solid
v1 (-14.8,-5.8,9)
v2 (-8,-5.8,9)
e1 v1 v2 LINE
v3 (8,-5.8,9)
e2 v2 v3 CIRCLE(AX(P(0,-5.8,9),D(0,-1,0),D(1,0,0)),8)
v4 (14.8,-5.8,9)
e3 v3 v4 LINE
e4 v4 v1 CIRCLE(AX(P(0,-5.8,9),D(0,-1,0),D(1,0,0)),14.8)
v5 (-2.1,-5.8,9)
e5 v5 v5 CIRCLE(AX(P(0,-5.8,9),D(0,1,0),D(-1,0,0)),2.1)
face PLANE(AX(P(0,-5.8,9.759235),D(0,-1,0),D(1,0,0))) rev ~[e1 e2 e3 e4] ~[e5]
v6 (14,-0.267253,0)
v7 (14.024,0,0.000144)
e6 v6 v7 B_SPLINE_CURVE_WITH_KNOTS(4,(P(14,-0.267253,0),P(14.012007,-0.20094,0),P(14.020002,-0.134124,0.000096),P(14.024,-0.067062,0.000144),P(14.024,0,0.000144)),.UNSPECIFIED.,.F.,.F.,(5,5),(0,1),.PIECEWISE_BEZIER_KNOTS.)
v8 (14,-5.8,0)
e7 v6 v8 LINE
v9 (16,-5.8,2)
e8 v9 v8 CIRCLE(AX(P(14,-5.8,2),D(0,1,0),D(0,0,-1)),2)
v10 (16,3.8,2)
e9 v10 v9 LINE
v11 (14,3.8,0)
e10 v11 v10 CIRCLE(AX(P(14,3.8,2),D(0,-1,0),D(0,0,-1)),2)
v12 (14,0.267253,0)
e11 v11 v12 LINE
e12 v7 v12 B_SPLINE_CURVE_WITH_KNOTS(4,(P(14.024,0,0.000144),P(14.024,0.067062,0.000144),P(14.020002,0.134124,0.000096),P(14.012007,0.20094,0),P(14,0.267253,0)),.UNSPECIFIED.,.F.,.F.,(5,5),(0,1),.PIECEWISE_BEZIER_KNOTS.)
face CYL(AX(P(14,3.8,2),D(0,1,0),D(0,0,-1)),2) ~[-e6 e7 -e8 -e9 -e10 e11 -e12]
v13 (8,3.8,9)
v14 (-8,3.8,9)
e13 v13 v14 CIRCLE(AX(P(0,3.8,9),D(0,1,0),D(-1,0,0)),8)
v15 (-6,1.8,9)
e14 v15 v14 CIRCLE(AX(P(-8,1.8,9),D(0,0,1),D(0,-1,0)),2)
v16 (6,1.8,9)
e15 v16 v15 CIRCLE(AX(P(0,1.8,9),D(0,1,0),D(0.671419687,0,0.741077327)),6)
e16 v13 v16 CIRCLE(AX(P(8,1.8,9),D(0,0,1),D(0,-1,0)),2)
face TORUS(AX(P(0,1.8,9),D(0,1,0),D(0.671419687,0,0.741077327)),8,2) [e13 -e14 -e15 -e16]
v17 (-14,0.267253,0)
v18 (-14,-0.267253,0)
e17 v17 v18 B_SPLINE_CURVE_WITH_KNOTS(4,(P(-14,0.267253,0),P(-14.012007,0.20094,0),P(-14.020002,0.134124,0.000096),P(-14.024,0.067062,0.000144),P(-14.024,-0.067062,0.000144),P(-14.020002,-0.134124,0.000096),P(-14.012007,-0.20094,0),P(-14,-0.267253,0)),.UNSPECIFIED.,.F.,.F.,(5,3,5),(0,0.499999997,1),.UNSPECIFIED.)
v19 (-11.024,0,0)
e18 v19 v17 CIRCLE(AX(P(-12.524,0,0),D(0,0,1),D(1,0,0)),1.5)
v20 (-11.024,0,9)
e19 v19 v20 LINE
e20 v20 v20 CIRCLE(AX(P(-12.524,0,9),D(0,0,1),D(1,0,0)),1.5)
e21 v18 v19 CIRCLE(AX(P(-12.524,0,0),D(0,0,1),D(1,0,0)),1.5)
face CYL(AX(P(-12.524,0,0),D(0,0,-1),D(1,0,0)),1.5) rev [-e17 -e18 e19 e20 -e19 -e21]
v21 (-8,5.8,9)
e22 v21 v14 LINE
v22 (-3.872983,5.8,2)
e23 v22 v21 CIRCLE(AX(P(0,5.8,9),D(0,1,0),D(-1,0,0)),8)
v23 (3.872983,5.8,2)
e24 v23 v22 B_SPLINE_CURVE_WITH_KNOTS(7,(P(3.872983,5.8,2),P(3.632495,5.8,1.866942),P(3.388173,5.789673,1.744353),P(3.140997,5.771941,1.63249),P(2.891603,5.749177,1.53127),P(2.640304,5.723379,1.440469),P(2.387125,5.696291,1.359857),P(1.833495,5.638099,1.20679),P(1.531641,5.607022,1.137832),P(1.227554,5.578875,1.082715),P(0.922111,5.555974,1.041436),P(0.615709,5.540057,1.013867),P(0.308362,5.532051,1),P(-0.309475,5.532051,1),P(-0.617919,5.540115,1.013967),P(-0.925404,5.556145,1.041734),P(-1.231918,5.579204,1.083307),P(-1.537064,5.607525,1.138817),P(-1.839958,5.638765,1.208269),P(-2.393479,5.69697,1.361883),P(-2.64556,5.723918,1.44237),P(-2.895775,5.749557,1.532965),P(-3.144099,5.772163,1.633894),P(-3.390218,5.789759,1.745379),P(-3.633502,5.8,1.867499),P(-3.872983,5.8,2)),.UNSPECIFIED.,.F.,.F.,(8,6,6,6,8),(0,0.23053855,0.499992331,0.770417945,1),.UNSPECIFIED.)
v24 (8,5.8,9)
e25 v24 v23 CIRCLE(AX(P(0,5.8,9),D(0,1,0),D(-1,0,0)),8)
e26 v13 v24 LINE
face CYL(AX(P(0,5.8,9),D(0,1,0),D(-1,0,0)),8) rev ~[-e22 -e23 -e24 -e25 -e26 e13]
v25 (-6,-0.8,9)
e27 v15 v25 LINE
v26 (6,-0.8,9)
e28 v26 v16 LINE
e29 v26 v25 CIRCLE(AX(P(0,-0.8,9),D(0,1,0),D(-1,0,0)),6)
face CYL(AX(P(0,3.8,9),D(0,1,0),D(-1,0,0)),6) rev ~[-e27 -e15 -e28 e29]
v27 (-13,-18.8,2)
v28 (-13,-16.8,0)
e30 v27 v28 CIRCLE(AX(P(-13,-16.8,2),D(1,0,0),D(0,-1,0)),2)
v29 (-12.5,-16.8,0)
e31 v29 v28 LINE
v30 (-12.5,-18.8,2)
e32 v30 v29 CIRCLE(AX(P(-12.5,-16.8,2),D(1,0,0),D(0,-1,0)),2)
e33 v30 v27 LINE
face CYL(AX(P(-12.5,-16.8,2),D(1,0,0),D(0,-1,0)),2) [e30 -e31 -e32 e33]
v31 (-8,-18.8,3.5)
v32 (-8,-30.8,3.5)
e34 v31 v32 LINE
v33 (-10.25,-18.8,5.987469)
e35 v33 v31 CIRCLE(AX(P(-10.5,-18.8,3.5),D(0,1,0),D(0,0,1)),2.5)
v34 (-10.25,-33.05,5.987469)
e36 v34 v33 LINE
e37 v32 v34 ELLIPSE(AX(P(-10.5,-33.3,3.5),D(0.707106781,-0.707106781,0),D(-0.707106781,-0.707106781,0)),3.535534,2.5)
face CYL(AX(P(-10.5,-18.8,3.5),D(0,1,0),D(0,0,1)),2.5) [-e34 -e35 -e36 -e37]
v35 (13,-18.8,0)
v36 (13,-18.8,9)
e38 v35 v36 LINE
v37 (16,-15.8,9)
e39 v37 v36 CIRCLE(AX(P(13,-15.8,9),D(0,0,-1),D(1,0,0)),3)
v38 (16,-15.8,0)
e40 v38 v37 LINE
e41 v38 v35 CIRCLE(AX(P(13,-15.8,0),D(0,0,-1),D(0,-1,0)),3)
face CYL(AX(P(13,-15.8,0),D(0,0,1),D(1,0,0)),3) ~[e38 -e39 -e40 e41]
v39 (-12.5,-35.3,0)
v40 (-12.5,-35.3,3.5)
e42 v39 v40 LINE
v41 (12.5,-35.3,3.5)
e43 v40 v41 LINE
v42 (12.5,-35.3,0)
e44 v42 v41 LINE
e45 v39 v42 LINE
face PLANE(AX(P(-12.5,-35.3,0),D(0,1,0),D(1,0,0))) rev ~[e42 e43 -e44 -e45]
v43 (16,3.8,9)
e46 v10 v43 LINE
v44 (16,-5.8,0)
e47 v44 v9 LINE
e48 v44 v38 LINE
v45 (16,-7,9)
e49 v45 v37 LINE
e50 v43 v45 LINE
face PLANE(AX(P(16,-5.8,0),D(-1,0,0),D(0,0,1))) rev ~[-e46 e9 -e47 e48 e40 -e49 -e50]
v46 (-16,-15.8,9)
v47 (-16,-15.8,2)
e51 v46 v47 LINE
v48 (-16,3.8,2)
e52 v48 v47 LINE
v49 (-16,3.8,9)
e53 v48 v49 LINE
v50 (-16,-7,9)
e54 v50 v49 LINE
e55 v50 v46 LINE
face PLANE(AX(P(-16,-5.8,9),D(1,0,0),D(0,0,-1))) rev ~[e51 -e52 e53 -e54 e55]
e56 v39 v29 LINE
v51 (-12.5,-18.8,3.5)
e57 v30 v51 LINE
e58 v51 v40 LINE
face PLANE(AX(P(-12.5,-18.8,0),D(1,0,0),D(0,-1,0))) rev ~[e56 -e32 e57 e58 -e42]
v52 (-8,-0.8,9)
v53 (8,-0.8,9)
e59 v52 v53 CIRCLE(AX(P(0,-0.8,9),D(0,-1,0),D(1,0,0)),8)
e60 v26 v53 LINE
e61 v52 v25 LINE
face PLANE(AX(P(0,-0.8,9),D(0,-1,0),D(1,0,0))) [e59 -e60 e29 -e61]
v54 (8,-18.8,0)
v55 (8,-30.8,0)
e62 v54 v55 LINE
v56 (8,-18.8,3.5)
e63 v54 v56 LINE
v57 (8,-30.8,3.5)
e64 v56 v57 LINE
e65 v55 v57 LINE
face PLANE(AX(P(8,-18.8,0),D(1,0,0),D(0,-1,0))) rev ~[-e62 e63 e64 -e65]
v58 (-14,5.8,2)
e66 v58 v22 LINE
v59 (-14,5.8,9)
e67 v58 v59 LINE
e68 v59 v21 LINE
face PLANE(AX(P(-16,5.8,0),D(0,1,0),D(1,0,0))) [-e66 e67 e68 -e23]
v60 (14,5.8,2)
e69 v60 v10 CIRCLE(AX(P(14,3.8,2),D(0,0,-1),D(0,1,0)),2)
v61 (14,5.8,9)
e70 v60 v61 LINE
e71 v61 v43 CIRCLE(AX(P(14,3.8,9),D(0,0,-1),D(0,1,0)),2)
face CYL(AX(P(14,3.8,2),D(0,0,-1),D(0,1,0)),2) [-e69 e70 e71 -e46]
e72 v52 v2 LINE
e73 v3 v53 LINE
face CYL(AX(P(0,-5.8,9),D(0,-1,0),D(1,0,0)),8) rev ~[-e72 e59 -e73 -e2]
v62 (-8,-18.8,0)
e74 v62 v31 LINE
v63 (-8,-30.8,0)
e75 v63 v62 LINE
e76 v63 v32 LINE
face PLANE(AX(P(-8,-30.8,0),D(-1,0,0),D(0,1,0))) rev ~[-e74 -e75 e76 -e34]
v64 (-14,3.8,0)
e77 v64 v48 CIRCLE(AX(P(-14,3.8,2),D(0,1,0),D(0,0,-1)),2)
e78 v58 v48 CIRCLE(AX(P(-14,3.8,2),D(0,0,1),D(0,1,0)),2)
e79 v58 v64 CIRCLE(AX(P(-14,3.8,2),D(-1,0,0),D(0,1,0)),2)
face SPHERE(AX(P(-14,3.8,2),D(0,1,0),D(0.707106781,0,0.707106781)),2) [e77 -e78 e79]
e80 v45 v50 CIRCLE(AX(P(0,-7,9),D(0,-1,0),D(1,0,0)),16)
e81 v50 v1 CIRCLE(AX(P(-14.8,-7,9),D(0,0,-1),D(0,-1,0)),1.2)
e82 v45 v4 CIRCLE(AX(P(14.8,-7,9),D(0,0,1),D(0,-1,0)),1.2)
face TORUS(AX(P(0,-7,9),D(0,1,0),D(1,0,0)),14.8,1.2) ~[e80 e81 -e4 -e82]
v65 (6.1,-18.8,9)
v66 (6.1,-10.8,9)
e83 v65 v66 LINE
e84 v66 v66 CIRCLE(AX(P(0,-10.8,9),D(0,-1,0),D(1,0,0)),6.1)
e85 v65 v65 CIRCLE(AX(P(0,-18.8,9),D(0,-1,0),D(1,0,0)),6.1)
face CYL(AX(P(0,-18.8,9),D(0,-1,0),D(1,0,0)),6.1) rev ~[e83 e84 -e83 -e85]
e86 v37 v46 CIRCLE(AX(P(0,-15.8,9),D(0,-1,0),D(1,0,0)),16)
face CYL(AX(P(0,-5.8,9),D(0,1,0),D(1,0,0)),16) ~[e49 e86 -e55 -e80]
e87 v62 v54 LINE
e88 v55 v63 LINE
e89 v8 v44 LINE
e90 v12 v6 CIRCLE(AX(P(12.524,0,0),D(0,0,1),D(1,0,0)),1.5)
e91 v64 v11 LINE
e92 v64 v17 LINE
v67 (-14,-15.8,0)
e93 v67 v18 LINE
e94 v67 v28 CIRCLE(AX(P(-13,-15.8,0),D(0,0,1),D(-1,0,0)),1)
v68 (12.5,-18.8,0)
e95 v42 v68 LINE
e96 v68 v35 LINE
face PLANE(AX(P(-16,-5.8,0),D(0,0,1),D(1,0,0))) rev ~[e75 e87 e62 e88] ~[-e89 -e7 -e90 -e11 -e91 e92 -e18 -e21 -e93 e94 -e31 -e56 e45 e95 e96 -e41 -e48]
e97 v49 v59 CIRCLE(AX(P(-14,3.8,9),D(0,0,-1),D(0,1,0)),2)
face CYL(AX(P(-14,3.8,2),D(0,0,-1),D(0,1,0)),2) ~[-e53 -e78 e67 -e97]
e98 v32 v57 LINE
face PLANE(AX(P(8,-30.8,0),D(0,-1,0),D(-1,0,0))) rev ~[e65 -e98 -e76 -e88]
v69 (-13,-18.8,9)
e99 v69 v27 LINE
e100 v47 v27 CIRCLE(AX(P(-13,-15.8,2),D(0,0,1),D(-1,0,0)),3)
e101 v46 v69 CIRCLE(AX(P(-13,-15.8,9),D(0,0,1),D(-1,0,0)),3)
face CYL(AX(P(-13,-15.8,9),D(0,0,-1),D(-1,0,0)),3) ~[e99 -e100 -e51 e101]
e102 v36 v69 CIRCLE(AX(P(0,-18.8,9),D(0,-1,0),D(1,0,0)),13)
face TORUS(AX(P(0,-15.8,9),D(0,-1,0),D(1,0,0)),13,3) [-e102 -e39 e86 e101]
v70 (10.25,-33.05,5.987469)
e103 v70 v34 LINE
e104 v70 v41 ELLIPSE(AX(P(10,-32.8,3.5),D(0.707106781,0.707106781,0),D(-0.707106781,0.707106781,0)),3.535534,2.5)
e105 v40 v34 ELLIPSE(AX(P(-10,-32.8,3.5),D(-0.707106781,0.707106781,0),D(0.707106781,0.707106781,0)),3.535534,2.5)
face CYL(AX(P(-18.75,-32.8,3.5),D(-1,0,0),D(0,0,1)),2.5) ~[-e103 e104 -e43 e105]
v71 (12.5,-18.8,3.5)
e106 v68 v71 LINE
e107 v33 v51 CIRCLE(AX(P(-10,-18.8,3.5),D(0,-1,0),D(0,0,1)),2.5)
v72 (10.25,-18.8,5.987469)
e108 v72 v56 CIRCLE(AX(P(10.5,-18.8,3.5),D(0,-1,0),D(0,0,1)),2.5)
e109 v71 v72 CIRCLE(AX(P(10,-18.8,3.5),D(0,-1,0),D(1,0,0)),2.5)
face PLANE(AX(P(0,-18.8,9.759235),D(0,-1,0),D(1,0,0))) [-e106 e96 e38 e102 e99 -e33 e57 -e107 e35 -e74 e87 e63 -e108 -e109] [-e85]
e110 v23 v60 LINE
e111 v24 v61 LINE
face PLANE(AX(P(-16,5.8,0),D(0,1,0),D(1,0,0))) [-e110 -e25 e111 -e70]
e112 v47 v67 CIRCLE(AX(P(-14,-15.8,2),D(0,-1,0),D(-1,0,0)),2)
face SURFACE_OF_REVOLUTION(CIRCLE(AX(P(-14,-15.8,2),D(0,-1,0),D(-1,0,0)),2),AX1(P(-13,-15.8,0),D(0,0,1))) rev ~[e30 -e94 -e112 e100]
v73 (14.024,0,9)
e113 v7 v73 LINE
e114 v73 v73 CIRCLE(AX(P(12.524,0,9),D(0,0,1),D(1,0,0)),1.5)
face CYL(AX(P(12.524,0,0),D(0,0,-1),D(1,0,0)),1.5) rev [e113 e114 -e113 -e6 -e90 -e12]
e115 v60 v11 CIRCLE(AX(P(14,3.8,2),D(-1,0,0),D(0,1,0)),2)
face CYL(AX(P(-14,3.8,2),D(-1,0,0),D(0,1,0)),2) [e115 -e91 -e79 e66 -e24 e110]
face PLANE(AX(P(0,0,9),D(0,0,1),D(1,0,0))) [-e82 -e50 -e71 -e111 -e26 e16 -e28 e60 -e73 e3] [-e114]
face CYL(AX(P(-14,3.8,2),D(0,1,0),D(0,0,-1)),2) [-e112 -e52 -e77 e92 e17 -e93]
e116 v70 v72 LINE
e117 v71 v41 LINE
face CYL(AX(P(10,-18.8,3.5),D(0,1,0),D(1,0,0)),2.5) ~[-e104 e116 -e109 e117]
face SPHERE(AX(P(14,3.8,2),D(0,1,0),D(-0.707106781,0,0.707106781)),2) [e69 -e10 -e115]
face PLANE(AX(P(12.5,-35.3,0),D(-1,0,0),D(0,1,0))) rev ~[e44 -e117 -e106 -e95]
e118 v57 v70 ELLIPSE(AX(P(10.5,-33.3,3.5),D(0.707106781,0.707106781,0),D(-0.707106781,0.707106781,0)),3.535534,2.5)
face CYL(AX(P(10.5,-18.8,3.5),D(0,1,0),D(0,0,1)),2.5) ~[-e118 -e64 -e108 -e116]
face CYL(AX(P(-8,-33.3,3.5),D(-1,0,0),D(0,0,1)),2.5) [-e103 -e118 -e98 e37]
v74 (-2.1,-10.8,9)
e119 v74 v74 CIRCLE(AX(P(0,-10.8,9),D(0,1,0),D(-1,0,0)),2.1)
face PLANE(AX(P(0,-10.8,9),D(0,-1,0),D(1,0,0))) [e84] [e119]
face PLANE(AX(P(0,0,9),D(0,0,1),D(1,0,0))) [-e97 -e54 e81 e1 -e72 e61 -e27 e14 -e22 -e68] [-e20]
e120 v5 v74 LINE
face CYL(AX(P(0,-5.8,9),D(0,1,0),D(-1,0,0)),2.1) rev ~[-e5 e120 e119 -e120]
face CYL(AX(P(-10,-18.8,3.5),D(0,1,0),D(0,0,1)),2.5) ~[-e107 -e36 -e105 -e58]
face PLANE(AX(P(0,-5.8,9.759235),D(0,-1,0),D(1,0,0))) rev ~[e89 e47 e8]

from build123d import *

# Parameters (mm, degrees)
F0_W          = 32
F0_H          = 11.6
F0_R          = 1.5
F1_DEPTH      = 9
F2_R          = 8
F1_FACE1_W    = 32
F1_FACE1_H    = 9
F3_DEPTH      = 5
F4_R          = 8
F5_DEPTH      = 2
F6_R          = 6
F7_DEPTH      = 25
F8_T1_DEPTH   = 28
F8_T3_DEPTH   = 12
F8_T5_DEPTH   = 14.6
F8_S9_W       = 2
F8_S9_H       = 2
F8_T10_DEPTH  = 2
F8_S15_W      = 2
F8_S15_H      = 2
F8_T16_DEPTH  = 2
F8_T20_ANGLE  = 275.6465366004
F10_DEPTH     = 13
F12_DEPTH     = 6
F13_T1_DEPTH  = 12
F13_T3_DEPTH  = 22.75
F13_T5_DEPTH  = 16
F13_T7_DEPTH  = 37.5
F13_T13_DEPTH = 18.25
F13_T17_DEPTH = 22.25
F13_T24_DEPTH = 18.25
F13_T28_DEPTH = 22.25
F14_R         = 3
F15_R         = 1.2
F16_R         = 6.1
F17_DEPTH     = 8
F18_T3_ANGLE  = 90
F18_T6_DEPTH  = 15
F18_T9_DEPTH  = 0.5
F19_R         = 2.1
F20_DEPTH     = 7


# Not quite as in the source:
# - a fillet or chamfer that OpenCascade refuses, or shapes differently, is made with other operations: its cross-section is extruded or revolved along the edge and cut away or added


with BuildPart() as f1:
    # F0 (on Top) → F1 (new body)
    with BuildSketch(Plane.XY):
        Rectangle(F0_W, F0_H)
        with Locations((-12.524, 0)):
            Circle(F0_R, mode=Mode.SUBTRACT)
        with Locations((12.524, 0)):
            Circle(F0_R, mode=Mode.SUBTRACT)
    extrude(amount=F1_DEPTH)

    # F2 (on face) + F1_face1 (on face) → F3 (cut)
    with BuildSketch(Plane.XZ.offset(5.8)):
        with Locations((0, 9)):
            Circle(F2_R)
    with BuildSketch(Plane(origin=(0, 5.8, 4.5), x_dir=(-1, 0, 0), z_dir=(0, 1, 0))):
        Rectangle(F1_FACE1_W, F1_FACE1_H)
    extrude(amount=-F3_DEPTH, dir=(0, -1, 0), mode=Mode.SUBTRACT)

    # F4 (on face) → F5 (cut)
    with BuildSketch(Plane(origin=(0, 5.8, 0), x_dir=(-1, 0, 0), z_dir=(0, 1, 0))):
        with Locations((0, 9)):
            Circle(F4_R)
    extrude(amount=-F5_DEPTH, mode=Mode.SUBTRACT)

    # F6 (on face) → F7 (cut)
    with BuildSketch(Plane(origin=(0, 3.8, 0), x_dir=(-1, 0, 0), z_dir=(0, 1, 0))):
        with Locations((0, 9)):
            Circle(F6_R)
    extrude(amount=-F7_DEPTH, mode=Mode.SUBTRACT)

    # F8: fillet of radius 2 on 6 edges, made by hand

    # F8_s2 → F8_t1 (cut)
    with BuildSketch(Plane.YZ.offset(-14)):
        with BuildLine():
            ThreePointArc((5.8, 2), (5.2142135624, 0.5857864376), (3.8, 0))
            Line((3.8, 0), (5.8, 0))
            Line((5.8, 0), (5.8, 2))
        make_face()
    extrude(amount=F8_T1_DEPTH, mode=Mode.SUBTRACT)

    # F8_s4 → F8_t3 (cut)
    with BuildSketch(Plane.XY.offset(2)):
        with BuildLine():
            ThreePointArc((-14, 5.8), (-15.4142135624, 5.2142135624), (-16, 3.8))
            Line((-16, 3.8), (-16, 5.8))
            Line((-16, 5.8), (-14, 5.8))
        make_face()
        with BuildLine():
            ThreePointArc((14, 5.8), (15.4142135624, 5.2142135624), (16, 3.8))
            Line((16, 3.8), (16, 5.8))
            Line((16, 5.8), (14, 5.8))
        make_face()
    extrude(amount=F8_T3_DEPTH, mode=Mode.SUBTRACT)

    # F8_s6 → F8_t5 (cut)
    with BuildSketch(Plane.XZ.offset(-3.8)):
        with BuildLine():
            ThreePointArc((-14, 0), (-15.4142135624, 0.5857864376), (-16, 2))
            Line((-16, 2), (-16, 0))
            Line((-16, 0), (-14, 0))
        make_face()
        with BuildLine():
            ThreePointArc((14, 0), (15.4142135624, 0.5857864376), (16, 2))
            Line((16, 2), (16, 0))
            Line((16, 0), (14, 0))
        make_face()
    extrude(amount=F8_T5_DEPTH, mode=Mode.SUBTRACT)


with BuildPart() as f8_tool8:
    # F8_s9 → F8_t10 (new body)
    with BuildSketch(Plane.XZ.offset(-3.8)):
        with Locations((15, 1)):
            Rectangle(F8_S9_W, F8_S9_H)
    extrude(amount=-F8_T10_DEPTH)

    # F8_s11 → F8_t12 (revolve, cut)
    with BuildSketch(Plane(origin=(14, 3.8, 2), x_dir=(-0.7071067812, 0, 0.7071067812), z_dir=(-0.7071067812, 0, -0.7071067812))):
        with BuildLine():
            ThreePointArc((0, -2), (2, 0), (0, 2))
            Line((0, 2), (0, -2))
        make_face()
    revolve(axis=Axis((14, 3.8, 2), (0, 1, 0)), mode=Mode.SUBTRACT)


with BuildPart() as f1_1:
    add(f1.part)

    # F8_t7: cut F8_tool8
    add(f8_tool8.part, mode=Mode.SUBTRACT)


with BuildPart() as f8_tool14:
    # F8_s15 → F8_t16 (new body)
    with BuildSketch(Plane.XZ.offset(-3.8)):
        with Locations((-15, 1)):
            Rectangle(F8_S15_W, F8_S15_H)
    extrude(amount=-F8_T16_DEPTH)

    # F8_s17 → F8_t18 (revolve, cut)
    with BuildSketch(Plane(origin=(-14, 3.8, 2), x_dir=(0.7071067812, 0, 0.7071067812), z_dir=(-0.7071067812, 0, 0.7071067812))):
        with BuildLine():
            ThreePointArc((0, -2), (2, 0), (0, 2))
            Line((0, 2), (0, -2))
        make_face()
    revolve(axis=Axis((-14, 3.8, 2), (0, 1, 0)), mode=Mode.SUBTRACT)


with BuildPart() as f1_2:
    add(f1_1.part)

    # F8_t13: cut F8_tool14
    add(f8_tool14.part, mode=Mode.SUBTRACT)

    # F8_s19 → F8_t20 (revolve, cut)
    with BuildSketch(Plane(origin=(-4.4781651596, 0, 4.057239564), x_dir=(0, 1, 0), z_dir=(-0.7410773266, 0, 0.6714196869))):
        with BuildLine():
            ThreePointArc((3.8, -14.6696959394), (3.2142135624, -13.255482377), (1.8, -12.6696959394))
            Line((1.8, -12.6696959394), (3.8, -12.6696959394))
            Line((3.8, -12.6696959394), (3.8, -14.6696959394))
        make_face()
    revolve(axis=Axis((0, 3.8, 9), (0, 1, 0)), revolution_arc=F8_T20_ANGLE, mode=Mode.SUBTRACT)

    # F9 (on face) → F10 (join)
    with BuildSketch(Plane.XZ.offset(5.8)):
        with BuildLine():
            Line((16, 0), (16, 9))
            ThreePointArc((16, 9), (0, 25), (-16, 9))
            Line((-16, 9), (-16, 0))
            Line((-16, 0), (-13.2287565553, 0))
            Line((-13.2287565553, 0), (0, 0))
            Line((0, 0), (13.2287565553, 0))
            Line((13.2287565553, 0), (16, 0))
        make_face()
    extrude(amount=F10_DEPTH)

    # F11 (on Top) → F12 (join)
    with BuildSketch(Plane.XY):
        Polygon((-8, -30.8), (-8, -18.8), (-12.5, -18.8), (-12.5, -35.3), (12.5, -35.3), (12.5, -18.8), (8, -18.8), (8, -30.8), align=None)
    extrude(amount=F12_DEPTH)

    # F13: fillet of radius 2.5 on 6 edges, made by hand

    # F13_s2 → F13_t1 (cut)
    with BuildSketch(Plane.XZ.offset(18.8)):
        with BuildLine():
            ThreePointArc((-10.5, 6), (-8.732233047, 5.267766953), (-8, 3.5))
            Line((-8, 3.5), (-8, 6))
            Line((-8, 6), (-10.5, 6))
        make_face()
        with BuildLine():
            ThreePointArc((10.5, 6), (8.732233047, 5.267766953), (8, 3.5))
            Line((8, 3.5), (8, 6))
            Line((8, 6), (10.5, 6))
        make_face()
    extrude(amount=F13_T1_DEPTH, mode=Mode.SUBTRACT)

    # F13_s4 → F13_t3 (cut)
    with BuildSketch(Plane.XZ.offset(18.8)):
        with BuildLine():
            ThreePointArc((-10, 6), (-11.767766953, 5.267766953), (-12.5, 3.5))
            Line((-12.5, 3.5), (-12.5, 6))
            Line((-12.5, 6), (-10, 6))
        make_face()
        with BuildLine():
            ThreePointArc((12.5, 3.5), (11.767766953, 5.267766953), (10, 6))
            Line((10, 6), (12.5, 6))
            Line((12.5, 6), (12.5, 3.5))
        make_face()
    extrude(amount=F13_T3_DEPTH, mode=Mode.SUBTRACT)

    # F13_s6 → F13_t5 (cut)
    with BuildSketch(Plane.YZ.offset(-8)):
        with BuildLine():
            ThreePointArc((-33.3, 6), (-31.532233047, 5.267766953), (-30.8, 3.5))
            Line((-30.8, 3.5), (-30.8, 6))
            Line((-30.8, 6), (-33.3, 6))
        make_face()
    extrude(amount=F13_T5_DEPTH, mode=Mode.SUBTRACT)

    # F13_s8 → F13_t7 (cut)
    with BuildSketch(Plane.YZ.offset(-18.75)):
        with BuildLine():
            ThreePointArc((-32.8, 6), (-34.567766953, 5.267766953), (-35.3, 3.5))
            Line((-35.3, 3.5), (-35.3, 6))
            Line((-35.3, 6), (-32.8, 6))
        make_face()
    extrude(amount=F13_T7_DEPTH, mode=Mode.SUBTRACT)


with BuildPart() as f13_tool11:
    # F13_s12 → F13_t13 (new body)
    with BuildSketch(Plane.XZ.offset(37.05)):
        with BuildLine():
            ThreePointArc((-10.5, 6), (-8.732233047, 5.267766953), (-8, 3.5))
            Line((-8, 3.5), (-8, 6))
            Line((-8, 6), (-10.5, 6))
        make_face()
    extrude(amount=-F13_T13_DEPTH)

    split(bisect_by=Plane.XZ.offset(30.8), keep=Keep.TOP)


with BuildPart() as f13_tool15:
    # F13_s16 → F13_t17 (new body)
    with BuildSketch(Plane.YZ.offset(8)):
        with BuildLine():
            ThreePointArc((-33.3, 6), (-31.532233047, 5.267766953), (-30.8, 3.5))
            Line((-30.8, 3.5), (-30.8, 6))
            Line((-30.8, 6), (-33.3, 6))
        make_face()
    extrude(amount=-F13_T17_DEPTH)

    split(bisect_by=Plane.YZ.offset(-8), keep=Keep.BOTTOM)


with BuildPart() as f13_tool11_1:
    add(f13_tool11.part)

    # F13_t19: intersect F13_tool15
    add(f13_tool15.part, mode=Mode.INTERSECT)


with BuildPart() as f1_3:
    add(f1_2.part)

    # F13_t9: cut F13_tool11
    add(f13_tool11_1.part, mode=Mode.SUBTRACT)


with BuildPart() as f13_tool22:
    # F13_s23 → F13_t24 (new body)
    with BuildSketch(Plane.XZ.offset(18.8)):
        with BuildLine():
            ThreePointArc((10.5, 6), (8.732233047, 5.267766953), (8, 3.5))
            Line((8, 3.5), (8, 6))
            Line((8, 6), (10.5, 6))
        make_face()
    extrude(amount=F13_T24_DEPTH)

    split(bisect_by=Plane.XZ.offset(30.8), keep=Keep.TOP)


with BuildPart() as f13_tool26:
    # F13_s27 → F13_t28 (new body)
    with BuildSketch(Plane.YZ.offset(14.25)):
        with BuildLine():
            ThreePointArc((-33.3, 6), (-31.532233047, 5.267766953), (-30.8, 3.5))
            Line((-30.8, 3.5), (-30.8, 6))
            Line((-30.8, 6), (-33.3, 6))
        make_face()
    extrude(amount=-F13_T28_DEPTH)

    split(bisect_by=Plane.YZ.offset(8), keep=Keep.TOP)


with BuildPart() as f13_tool22_1:
    add(f13_tool22.part)

    # F13_t30: intersect F13_tool26
    add(f13_tool26.part, mode=Mode.INTERSECT)


with BuildPart() as f1_4:
    add(f1_3.part)

    # F13_t20: cut F13_tool22
    add(f13_tool22_1.part, mode=Mode.SUBTRACT)

    # F14
    f14_edges = [f1_4.edges().sort_by_distance(p)[0] for p in [
        (0, -18.8, 25),
        (16, -18.8, 4.5),
    ]]
    fillet(f14_edges, radius=F14_R)

    # F15
    f15_edges = [f1_4.edges().sort_by_distance(p)[0] for p in [
        (0, -5.8, 25),
    ]]
    fillet(f15_edges, radius=F15_R)

    # F16 (on face) → F17 (cut)
    with BuildSketch(Plane.XZ.offset(18.8)):
        with Locations((0, 9)):
            Circle(F16_R)
    extrude(amount=-F17_DEPTH, mode=Mode.SUBTRACT)

    # F18: fillet of radius 2 on 3 edges, made by hand


with BuildPart() as f18_tool1:
    # F18_s2 → F18_t3 (revolve)
    with BuildSketch(Plane.XZ.offset(15.8)):
        with BuildLine():
            ThreePointArc((-16, 2), (-15.4142135624, 0.5857864376), (-14, 0))
            Line((-14, 0), (-16, 0))
            Line((-16, 0), (-16, 2))
        make_face()
    revolve(axis=Axis((-13, -15.8, 0), (0, 0, 1)), revolution_arc=F18_T3_ANGLE)


with BuildPart() as f18_tool4:
    # F18_s5 → F18_t6 (new body)
    with BuildSketch(Plane.XZ.offset(0.8)):
        with BuildLine():
            ThreePointArc((-16, 2), (-15.4142135624, 0.5857864376), (-14, 0))
            Line((-14, 0), (-16, 0))
            Line((-16, 0), (-16, 2))
        make_face()
    extrude(amount=F18_T6_DEPTH)


with BuildPart() as f18_tool7:
    # F18_s8 → F18_t9 (new body)
    with BuildSketch(Plane.YZ.offset(-12.5)):
        with BuildLine():
            ThreePointArc((-18.8, 2), (-18.2142135624, 0.5857864376), (-16.8, 0))
            Line((-16.8, 0), (-18.8, 0))
            Line((-18.8, 0), (-18.8, 2))
        make_face()
    extrude(amount=-F18_T9_DEPTH)


with BuildPart() as f1_5:
    add(f1_4.part)

    # F18_t10: cut F18_tool1, F18_tool4, F18_tool7
    add([f18_tool1.part, f18_tool4.part, f18_tool7.part], mode=Mode.SUBTRACT)

    # F19 (on face) → F20 (cut)
    with BuildSketch(Plane(origin=(0, -5.8, 0), x_dir=(-1, 0, 0), z_dir=(0, 1, 0))):
        with Locations((0, 9)):
            Circle(F19_R)
    extrude(amount=-F20_DEPTH, mode=Mode.SUBTRACT)


solid = f1_5.part
